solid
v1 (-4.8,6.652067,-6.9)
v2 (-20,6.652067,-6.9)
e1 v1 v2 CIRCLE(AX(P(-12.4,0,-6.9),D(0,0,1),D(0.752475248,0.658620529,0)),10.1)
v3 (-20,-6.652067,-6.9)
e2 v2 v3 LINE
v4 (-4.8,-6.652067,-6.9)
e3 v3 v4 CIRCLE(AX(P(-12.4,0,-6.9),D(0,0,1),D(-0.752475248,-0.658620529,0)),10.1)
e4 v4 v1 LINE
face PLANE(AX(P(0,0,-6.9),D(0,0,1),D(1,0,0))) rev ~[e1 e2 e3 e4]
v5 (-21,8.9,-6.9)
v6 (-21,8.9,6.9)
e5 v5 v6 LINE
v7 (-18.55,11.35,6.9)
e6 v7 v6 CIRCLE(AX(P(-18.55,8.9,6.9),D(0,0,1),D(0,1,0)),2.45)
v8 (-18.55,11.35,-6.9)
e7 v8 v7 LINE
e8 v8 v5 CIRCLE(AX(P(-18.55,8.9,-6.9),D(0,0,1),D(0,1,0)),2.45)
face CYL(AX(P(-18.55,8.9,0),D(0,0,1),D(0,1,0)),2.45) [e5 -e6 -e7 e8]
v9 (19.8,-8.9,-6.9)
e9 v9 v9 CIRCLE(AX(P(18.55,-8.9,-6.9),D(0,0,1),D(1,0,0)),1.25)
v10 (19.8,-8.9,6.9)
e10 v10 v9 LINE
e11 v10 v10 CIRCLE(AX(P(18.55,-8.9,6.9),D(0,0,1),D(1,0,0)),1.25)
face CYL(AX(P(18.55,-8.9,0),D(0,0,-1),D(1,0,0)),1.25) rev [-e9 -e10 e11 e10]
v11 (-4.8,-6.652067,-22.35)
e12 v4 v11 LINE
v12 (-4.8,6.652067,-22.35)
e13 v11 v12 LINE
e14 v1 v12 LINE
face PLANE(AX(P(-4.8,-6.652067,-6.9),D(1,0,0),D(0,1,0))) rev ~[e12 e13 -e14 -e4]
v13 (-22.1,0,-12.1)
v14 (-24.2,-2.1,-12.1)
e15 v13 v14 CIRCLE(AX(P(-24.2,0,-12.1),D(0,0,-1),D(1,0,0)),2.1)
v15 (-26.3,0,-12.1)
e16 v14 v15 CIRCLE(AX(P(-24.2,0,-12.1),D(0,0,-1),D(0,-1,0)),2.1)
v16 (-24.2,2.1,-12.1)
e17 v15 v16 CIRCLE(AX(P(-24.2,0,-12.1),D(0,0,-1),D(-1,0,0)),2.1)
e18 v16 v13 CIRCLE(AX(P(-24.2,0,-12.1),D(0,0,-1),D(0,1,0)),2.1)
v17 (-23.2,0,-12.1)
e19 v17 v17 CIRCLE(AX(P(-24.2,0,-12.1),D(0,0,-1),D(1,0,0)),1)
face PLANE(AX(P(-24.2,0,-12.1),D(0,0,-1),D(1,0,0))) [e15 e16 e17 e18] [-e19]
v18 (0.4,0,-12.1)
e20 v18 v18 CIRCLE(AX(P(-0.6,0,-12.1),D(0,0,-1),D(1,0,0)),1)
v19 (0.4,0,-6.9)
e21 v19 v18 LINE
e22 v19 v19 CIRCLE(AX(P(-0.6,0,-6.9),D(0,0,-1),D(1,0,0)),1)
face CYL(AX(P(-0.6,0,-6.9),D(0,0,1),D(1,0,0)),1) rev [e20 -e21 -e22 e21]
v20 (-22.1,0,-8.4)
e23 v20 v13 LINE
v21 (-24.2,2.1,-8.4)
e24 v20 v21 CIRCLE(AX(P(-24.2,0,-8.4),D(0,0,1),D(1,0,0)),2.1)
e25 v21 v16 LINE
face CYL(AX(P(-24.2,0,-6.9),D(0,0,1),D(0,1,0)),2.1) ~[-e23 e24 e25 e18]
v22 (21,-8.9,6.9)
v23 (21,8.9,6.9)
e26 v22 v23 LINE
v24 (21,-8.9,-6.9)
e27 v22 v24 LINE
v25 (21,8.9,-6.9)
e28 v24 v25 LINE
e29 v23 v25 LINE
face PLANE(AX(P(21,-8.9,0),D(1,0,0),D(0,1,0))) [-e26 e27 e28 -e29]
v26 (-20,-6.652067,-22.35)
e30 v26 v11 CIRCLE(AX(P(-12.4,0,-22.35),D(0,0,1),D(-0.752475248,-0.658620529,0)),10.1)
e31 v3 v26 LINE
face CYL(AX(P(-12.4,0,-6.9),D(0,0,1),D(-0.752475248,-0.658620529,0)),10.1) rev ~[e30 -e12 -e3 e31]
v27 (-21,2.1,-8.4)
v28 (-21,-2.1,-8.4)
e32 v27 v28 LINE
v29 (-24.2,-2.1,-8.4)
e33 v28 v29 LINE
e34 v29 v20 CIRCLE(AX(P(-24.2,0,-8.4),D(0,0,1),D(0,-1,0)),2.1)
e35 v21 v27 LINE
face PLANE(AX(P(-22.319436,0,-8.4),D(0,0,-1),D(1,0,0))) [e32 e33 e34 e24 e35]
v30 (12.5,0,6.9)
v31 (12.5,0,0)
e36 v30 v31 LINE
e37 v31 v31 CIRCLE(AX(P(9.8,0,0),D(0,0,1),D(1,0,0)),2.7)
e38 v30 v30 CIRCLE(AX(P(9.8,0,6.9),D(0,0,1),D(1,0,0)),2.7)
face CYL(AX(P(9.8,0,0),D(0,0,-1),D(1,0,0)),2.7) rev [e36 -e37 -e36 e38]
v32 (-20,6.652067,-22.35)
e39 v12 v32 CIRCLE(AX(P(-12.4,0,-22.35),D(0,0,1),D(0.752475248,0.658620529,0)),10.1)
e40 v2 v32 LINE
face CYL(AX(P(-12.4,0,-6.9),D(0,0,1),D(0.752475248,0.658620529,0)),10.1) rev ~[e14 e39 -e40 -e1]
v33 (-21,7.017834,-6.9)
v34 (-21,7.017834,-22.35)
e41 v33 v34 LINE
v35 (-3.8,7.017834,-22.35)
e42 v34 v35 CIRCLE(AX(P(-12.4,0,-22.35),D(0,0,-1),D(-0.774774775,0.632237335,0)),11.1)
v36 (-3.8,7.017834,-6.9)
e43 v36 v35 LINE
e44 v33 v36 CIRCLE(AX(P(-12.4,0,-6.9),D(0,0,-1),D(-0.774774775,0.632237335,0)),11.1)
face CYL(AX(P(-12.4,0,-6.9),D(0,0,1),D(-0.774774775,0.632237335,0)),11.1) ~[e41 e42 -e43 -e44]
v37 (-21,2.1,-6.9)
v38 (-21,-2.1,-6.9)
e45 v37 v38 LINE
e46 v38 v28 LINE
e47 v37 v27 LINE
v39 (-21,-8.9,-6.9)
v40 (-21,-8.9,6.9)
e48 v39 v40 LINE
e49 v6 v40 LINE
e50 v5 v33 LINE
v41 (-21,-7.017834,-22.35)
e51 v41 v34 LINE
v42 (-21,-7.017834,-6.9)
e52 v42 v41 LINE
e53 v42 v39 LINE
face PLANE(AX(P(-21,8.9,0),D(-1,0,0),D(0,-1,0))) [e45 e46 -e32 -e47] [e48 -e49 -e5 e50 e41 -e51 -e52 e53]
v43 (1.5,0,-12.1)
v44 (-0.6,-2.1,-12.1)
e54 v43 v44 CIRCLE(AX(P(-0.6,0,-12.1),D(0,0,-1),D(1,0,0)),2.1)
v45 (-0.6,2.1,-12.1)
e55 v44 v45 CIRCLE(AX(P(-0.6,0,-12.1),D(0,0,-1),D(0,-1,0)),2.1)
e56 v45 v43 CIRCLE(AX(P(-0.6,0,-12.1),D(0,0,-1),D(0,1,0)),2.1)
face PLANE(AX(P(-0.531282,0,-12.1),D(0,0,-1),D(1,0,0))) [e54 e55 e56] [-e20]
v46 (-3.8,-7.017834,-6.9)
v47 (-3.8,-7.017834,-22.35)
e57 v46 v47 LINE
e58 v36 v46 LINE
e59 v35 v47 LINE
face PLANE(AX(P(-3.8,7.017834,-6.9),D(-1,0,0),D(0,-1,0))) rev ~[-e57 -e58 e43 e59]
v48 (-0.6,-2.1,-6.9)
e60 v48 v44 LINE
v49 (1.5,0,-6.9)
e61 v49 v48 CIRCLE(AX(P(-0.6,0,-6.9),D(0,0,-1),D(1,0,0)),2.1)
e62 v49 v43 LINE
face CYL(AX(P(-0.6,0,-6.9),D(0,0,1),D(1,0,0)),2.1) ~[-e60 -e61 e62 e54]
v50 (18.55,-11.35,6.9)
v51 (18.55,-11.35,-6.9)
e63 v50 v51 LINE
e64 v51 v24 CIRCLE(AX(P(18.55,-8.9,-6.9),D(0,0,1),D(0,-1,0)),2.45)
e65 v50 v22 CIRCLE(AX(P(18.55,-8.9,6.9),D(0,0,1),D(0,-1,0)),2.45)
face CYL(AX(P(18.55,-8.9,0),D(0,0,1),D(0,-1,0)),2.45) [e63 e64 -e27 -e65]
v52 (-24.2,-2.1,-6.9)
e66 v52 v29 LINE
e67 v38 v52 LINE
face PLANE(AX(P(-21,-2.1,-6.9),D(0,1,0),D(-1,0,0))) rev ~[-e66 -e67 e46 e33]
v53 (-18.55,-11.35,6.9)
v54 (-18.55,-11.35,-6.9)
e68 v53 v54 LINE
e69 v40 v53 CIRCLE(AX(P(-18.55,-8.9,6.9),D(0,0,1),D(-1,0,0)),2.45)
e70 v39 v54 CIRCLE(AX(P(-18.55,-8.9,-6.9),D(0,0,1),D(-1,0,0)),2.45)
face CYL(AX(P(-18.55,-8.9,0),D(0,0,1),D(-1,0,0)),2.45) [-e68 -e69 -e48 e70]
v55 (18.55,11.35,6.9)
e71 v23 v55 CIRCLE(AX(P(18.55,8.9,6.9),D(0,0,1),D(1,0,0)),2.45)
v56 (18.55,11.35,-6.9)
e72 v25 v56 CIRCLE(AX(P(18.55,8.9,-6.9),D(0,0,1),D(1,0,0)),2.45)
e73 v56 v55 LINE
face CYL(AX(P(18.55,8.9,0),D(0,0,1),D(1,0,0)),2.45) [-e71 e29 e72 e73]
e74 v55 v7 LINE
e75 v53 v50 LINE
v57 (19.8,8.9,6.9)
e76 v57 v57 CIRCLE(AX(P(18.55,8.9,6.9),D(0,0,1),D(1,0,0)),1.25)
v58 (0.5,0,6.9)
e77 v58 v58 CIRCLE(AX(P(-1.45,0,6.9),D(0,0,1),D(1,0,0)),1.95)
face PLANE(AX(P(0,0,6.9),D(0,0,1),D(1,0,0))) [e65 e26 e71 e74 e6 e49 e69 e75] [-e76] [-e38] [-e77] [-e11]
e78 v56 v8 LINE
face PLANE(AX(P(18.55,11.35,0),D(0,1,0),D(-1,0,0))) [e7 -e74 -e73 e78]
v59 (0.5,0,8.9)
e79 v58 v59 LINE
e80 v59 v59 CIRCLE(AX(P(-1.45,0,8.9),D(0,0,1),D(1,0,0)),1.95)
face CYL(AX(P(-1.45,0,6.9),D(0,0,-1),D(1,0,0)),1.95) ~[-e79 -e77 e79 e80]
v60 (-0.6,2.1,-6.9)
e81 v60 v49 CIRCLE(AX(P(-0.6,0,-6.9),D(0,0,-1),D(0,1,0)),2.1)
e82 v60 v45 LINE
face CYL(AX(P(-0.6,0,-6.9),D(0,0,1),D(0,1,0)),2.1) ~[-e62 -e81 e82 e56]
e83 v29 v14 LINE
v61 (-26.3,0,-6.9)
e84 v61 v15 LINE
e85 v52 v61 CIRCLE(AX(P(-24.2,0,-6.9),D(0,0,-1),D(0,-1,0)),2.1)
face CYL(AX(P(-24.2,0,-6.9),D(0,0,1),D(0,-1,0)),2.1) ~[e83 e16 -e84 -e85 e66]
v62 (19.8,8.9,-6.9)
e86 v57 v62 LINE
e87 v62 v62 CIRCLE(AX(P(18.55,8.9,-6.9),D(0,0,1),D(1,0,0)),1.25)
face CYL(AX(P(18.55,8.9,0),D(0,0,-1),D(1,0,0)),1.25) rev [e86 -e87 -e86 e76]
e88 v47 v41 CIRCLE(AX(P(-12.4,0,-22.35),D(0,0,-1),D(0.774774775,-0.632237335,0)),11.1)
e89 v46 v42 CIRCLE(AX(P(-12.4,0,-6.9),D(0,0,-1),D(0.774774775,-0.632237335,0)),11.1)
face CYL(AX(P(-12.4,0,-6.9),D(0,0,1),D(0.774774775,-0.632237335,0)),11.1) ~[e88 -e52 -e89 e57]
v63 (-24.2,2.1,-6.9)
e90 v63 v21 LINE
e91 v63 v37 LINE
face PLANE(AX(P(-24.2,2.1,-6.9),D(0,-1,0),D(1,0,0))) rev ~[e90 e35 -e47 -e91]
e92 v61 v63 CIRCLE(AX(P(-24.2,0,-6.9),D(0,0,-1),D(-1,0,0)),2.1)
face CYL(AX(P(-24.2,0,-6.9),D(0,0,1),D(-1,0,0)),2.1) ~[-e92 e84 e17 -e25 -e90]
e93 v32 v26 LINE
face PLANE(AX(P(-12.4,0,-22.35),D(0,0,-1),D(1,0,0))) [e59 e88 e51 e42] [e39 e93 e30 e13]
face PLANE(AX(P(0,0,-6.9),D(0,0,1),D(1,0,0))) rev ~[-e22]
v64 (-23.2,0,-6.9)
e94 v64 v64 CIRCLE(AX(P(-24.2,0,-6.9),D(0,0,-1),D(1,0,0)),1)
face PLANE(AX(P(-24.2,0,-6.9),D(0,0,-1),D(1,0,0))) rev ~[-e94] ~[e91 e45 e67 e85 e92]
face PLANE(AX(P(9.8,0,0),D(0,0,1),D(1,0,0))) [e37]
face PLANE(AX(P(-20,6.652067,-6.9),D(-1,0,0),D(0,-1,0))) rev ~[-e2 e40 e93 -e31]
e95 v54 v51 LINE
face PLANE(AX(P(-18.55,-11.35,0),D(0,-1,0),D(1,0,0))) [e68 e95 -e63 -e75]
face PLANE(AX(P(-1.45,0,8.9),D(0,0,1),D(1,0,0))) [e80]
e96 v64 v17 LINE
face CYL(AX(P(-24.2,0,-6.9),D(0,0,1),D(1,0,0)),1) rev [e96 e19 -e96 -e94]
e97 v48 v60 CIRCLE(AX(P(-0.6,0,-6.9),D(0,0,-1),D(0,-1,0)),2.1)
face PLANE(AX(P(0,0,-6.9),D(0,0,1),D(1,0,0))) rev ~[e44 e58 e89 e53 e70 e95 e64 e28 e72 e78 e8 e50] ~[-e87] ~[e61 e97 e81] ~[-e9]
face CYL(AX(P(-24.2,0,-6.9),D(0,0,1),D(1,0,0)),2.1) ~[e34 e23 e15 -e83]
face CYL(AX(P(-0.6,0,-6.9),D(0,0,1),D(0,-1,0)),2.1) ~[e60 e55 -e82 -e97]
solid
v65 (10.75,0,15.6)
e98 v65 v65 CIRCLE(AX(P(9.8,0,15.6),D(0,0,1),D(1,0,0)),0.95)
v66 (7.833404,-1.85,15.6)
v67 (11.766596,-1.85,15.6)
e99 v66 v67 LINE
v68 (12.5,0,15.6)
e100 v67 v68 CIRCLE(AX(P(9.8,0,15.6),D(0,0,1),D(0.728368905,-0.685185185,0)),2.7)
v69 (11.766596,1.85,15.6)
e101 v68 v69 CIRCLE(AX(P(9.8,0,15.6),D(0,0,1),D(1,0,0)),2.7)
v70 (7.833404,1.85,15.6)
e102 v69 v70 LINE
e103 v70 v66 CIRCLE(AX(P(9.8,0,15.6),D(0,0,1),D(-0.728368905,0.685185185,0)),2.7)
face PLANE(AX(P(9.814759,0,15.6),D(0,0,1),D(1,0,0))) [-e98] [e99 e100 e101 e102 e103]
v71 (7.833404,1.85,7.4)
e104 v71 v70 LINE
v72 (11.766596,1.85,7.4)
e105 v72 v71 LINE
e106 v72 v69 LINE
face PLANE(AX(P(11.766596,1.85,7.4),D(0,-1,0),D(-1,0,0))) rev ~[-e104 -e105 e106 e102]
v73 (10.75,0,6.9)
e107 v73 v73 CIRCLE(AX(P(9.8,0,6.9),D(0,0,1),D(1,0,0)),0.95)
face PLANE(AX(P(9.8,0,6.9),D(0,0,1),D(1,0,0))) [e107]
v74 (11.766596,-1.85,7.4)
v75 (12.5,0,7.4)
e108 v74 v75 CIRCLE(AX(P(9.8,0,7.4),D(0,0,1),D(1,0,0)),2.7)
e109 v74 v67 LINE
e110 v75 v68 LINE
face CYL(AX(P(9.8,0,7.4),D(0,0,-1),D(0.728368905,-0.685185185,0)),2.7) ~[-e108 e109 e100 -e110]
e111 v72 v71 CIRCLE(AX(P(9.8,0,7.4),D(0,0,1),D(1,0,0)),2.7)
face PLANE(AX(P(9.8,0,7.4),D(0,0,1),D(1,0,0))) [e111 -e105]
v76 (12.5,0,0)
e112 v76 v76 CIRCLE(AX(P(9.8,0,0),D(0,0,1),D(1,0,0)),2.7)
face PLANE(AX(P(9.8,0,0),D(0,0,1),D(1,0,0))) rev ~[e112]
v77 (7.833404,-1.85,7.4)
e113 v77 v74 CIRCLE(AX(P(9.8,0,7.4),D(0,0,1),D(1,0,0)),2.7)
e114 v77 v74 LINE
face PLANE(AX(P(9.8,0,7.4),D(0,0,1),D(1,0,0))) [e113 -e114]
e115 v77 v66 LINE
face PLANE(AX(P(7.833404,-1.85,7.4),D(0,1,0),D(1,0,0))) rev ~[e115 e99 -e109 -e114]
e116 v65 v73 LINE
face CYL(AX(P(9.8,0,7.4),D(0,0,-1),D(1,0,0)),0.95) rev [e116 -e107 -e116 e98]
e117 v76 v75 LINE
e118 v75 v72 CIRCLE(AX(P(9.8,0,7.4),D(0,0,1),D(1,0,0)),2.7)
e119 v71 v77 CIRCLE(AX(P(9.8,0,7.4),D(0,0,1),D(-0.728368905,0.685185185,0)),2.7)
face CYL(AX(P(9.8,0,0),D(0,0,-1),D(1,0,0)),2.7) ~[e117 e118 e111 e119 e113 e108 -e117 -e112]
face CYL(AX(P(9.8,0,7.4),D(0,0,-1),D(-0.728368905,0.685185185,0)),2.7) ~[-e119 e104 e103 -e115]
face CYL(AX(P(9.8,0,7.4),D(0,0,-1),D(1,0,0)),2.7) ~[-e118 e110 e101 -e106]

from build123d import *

# Parameters (mm, degrees)
F0_R      = 1.25
F0_R_2    = 2.7
F1_DEPTH  = 6.9
F0_R_3    = 0.95
F2_DEPTH  = 6.9
F3_DEPTH  = 7.4
F4_R      = 0.95
F5_DEPTH  = 8.2
F6_DEPTH  = 6.9
F9_DEPTH  = 15.45
F10_DEPTH = 1.5
F8_R      = 1
F11_DEPTH = 5.2
F12_R     = 1.95
F13_DEPTH = 2


with BuildPart() as f1:
    # F0 (on Top) → F1 (new body, symmetric)
    with BuildSketch(Plane.XY):
        with BuildLine():
            ThreePointArc((21, 8.9), (20.2824116139, 10.6324116139), (18.55, 11.35))
            Line((18.55, 11.35), (-18.55, 11.35))
            ThreePointArc((-18.55, 11.35), (-20.2824116139, 10.6324116139), (-21, 8.9))
            Line((-21, 8.9), (-21, -8.9))
            ThreePointArc((-21, -8.9), (-20.2824116139, -10.6324116139), (-18.55, -11.35))
            Line((-18.55, -11.35), (18.55, -11.35))
            ThreePointArc((18.55, -11.35), (20.2824116139, -10.6324116139), (21, -8.9))
            Line((21, -8.9), (21, 8.9))
        make_face()
        with Locations((18.55, -8.9)):
            Circle(F0_R, mode=Mode.SUBTRACT)
        with Locations((9.8, 0)):
            Circle(F0_R_2, mode=Mode.SUBTRACT)
        with Locations((18.55, 8.9)):
            Circle(F0_R, mode=Mode.SUBTRACT)
    extrude(amount=F1_DEPTH, both=True)

    # F0 (on Top) → F6 (join, through all)
    with BuildSketch(Plane.XY):
        with Locations((9.8, 0)):
            Circle(F0_R_2)
        with Locations((9.8, 0)):
            Circle(F0_R_3, mode=Mode.SUBTRACT)
        with Locations((9.8, 0)):
            Circle(F0_R_3)
    extrude(amount=-F6_DEPTH)

    # F7: union 

    # F8 (on face) → F9 (join)
    with BuildSketch(Plane(origin=(0, 0, -6.9), x_dir=(1, 0, 0), z_dir=(0, 0, -1))):
        with BuildLine():
            ThreePointArc((-3.8, 7.0178344238), (-12.4, 11.1), (-21, 7.0178344238))
            Line((-21, 7.0178344238), (-21, 2.1))
            Line((-21, 2.1), (-21, -2.1))
            Line((-21, -2.1), (-21, -7.0178344238))
            ThreePointArc((-21, -7.0178344238), (-12.4, -11.1), (-3.8, -7.0178344238))
            Line((-3.8, -7.0178344238), (-3.8, -2.1))
            Line((-3.8, -2.1), (-3.8, 2.1))
            Line((-3.8, 2.1), (-3.8, 7.0178344238))
        make_face()
        with BuildLine():
            ThreePointArc((-20, 6.6520673478), (-12.4, 10.1), (-4.8, 6.6520673478))
            Line((-4.8, 6.6520673478), (-4.8, -6.6520673478))
            ThreePointArc((-4.8, -6.6520673478), (-12.4, -10.1), (-20, -6.6520673478))
            Line((-20, -6.6520673478), (-20, 6.6520673478))
        make_face(mode=Mode.SUBTRACT)
    extrude(amount=F9_DEPTH)

    # F8 (on face) → F10 (join)
    with BuildSketch(Plane(origin=(0, 0, -6.9), x_dir=(1, 0, 0), z_dir=(0, 0, -1))):
        with BuildLine():
            Line((-21, -2.1), (-21, 2.1))
            Line((-21, 2.1), (-24.2, 2.1))
            ThreePointArc((-24.2, 2.1), (-22.7150757595, 1.4849242405), (-22.1, 0))
            ThreePointArc((-22.1, 0), (-22.7150757595, -1.4849242405), (-24.2, -2.1))
            Line((-24.2, -2.1), (-21, -2.1))
        make_face()
    extrude(amount=F10_DEPTH)

    # F8 (on face) → F11 (join)
    with BuildSketch(Plane(origin=(0, 0, -6.9), x_dir=(1, 0, 0), z_dir=(0, 0, -1))):
        with BuildLine():
            ThreePointArc((-22.1, 0), (-22.7150757595, 1.4849242405), (-24.2, 2.1))
            ThreePointArc((-24.2, 2.1), (-25.6849242405, 1.4849242405), (-26.3, 0))
            ThreePointArc((-26.3, 0), (-25.6849242405, -1.4849242405), (-24.2, -2.1))
            ThreePointArc((-24.2, -2.1), (-22.7150757595, -1.4849242405), (-22.1, 0))
        make_face()
        with Locations((-24.2, 0)):
            Circle(F8_R, mode=Mode.SUBTRACT)
        with BuildLine():
            ThreePointArc((1.5, 0), (0.8849242405, 1.4849242405), (-0.6, 2.1))
            ThreePointArc((-0.6, 2.1), (-2.7, 0), (-0.6, -2.1))
            ThreePointArc((-0.6, -2.1), (0.8849242405, -1.4849242405), (1.5, 0))
        make_face()
        with Locations((-0.6, 0)):
            Circle(F8_R, mode=Mode.SUBTRACT)
    extrude(amount=F11_DEPTH)

    # F12 (on face) → F13 (join)
    with BuildSketch(Plane.XY.offset(6.9)):
        with Locations((-1.45, 0)):
            Circle(F12_R)
    extrude(amount=F13_DEPTH)


with BuildPart() as f2:
    # F0 (on Top) → F2 (new body)
    with BuildSketch(Plane.XY):
        with Locations((9.8, 0)):
            Circle(F0_R_3)
    extrude(amount=F2_DEPTH)

    # F0 (on Top) → F3 (join)
    with BuildSketch(Plane.XY):
        with Locations((9.8, 0)):
            Circle(F0_R_2)
        with Locations((9.8, 0)):
            Circle(F0_R_3, mode=Mode.SUBTRACT)
    extrude(amount=F3_DEPTH)

    # F4 (on face) → F5 (join)
    with BuildSketch(Plane.XY.offset(7.4)):
        with BuildLine():
            ThreePointArc((11.7665960439, -1.85), (12.3099610872, -0.9950353465), (12.5, 0))
            ThreePointArc((12.5, 0), (12.3099610872, 0.9950353465), (11.7665960439, 1.85))
            Line((11.7665960439, 1.85), (7.8334039561, 1.85))
            ThreePointArc((7.8334039561, 1.85), (7.1, 0), (7.8334039561, -1.85))
            Line((7.8334039561, -1.85), (11.7665960439, -1.85))
        make_face()
        with Locations((9.8, 0)):
            Circle(F4_R, mode=Mode.SUBTRACT)
    extrude(amount=F5_DEPTH)


solid = Compound([f1.part, f2.part])
